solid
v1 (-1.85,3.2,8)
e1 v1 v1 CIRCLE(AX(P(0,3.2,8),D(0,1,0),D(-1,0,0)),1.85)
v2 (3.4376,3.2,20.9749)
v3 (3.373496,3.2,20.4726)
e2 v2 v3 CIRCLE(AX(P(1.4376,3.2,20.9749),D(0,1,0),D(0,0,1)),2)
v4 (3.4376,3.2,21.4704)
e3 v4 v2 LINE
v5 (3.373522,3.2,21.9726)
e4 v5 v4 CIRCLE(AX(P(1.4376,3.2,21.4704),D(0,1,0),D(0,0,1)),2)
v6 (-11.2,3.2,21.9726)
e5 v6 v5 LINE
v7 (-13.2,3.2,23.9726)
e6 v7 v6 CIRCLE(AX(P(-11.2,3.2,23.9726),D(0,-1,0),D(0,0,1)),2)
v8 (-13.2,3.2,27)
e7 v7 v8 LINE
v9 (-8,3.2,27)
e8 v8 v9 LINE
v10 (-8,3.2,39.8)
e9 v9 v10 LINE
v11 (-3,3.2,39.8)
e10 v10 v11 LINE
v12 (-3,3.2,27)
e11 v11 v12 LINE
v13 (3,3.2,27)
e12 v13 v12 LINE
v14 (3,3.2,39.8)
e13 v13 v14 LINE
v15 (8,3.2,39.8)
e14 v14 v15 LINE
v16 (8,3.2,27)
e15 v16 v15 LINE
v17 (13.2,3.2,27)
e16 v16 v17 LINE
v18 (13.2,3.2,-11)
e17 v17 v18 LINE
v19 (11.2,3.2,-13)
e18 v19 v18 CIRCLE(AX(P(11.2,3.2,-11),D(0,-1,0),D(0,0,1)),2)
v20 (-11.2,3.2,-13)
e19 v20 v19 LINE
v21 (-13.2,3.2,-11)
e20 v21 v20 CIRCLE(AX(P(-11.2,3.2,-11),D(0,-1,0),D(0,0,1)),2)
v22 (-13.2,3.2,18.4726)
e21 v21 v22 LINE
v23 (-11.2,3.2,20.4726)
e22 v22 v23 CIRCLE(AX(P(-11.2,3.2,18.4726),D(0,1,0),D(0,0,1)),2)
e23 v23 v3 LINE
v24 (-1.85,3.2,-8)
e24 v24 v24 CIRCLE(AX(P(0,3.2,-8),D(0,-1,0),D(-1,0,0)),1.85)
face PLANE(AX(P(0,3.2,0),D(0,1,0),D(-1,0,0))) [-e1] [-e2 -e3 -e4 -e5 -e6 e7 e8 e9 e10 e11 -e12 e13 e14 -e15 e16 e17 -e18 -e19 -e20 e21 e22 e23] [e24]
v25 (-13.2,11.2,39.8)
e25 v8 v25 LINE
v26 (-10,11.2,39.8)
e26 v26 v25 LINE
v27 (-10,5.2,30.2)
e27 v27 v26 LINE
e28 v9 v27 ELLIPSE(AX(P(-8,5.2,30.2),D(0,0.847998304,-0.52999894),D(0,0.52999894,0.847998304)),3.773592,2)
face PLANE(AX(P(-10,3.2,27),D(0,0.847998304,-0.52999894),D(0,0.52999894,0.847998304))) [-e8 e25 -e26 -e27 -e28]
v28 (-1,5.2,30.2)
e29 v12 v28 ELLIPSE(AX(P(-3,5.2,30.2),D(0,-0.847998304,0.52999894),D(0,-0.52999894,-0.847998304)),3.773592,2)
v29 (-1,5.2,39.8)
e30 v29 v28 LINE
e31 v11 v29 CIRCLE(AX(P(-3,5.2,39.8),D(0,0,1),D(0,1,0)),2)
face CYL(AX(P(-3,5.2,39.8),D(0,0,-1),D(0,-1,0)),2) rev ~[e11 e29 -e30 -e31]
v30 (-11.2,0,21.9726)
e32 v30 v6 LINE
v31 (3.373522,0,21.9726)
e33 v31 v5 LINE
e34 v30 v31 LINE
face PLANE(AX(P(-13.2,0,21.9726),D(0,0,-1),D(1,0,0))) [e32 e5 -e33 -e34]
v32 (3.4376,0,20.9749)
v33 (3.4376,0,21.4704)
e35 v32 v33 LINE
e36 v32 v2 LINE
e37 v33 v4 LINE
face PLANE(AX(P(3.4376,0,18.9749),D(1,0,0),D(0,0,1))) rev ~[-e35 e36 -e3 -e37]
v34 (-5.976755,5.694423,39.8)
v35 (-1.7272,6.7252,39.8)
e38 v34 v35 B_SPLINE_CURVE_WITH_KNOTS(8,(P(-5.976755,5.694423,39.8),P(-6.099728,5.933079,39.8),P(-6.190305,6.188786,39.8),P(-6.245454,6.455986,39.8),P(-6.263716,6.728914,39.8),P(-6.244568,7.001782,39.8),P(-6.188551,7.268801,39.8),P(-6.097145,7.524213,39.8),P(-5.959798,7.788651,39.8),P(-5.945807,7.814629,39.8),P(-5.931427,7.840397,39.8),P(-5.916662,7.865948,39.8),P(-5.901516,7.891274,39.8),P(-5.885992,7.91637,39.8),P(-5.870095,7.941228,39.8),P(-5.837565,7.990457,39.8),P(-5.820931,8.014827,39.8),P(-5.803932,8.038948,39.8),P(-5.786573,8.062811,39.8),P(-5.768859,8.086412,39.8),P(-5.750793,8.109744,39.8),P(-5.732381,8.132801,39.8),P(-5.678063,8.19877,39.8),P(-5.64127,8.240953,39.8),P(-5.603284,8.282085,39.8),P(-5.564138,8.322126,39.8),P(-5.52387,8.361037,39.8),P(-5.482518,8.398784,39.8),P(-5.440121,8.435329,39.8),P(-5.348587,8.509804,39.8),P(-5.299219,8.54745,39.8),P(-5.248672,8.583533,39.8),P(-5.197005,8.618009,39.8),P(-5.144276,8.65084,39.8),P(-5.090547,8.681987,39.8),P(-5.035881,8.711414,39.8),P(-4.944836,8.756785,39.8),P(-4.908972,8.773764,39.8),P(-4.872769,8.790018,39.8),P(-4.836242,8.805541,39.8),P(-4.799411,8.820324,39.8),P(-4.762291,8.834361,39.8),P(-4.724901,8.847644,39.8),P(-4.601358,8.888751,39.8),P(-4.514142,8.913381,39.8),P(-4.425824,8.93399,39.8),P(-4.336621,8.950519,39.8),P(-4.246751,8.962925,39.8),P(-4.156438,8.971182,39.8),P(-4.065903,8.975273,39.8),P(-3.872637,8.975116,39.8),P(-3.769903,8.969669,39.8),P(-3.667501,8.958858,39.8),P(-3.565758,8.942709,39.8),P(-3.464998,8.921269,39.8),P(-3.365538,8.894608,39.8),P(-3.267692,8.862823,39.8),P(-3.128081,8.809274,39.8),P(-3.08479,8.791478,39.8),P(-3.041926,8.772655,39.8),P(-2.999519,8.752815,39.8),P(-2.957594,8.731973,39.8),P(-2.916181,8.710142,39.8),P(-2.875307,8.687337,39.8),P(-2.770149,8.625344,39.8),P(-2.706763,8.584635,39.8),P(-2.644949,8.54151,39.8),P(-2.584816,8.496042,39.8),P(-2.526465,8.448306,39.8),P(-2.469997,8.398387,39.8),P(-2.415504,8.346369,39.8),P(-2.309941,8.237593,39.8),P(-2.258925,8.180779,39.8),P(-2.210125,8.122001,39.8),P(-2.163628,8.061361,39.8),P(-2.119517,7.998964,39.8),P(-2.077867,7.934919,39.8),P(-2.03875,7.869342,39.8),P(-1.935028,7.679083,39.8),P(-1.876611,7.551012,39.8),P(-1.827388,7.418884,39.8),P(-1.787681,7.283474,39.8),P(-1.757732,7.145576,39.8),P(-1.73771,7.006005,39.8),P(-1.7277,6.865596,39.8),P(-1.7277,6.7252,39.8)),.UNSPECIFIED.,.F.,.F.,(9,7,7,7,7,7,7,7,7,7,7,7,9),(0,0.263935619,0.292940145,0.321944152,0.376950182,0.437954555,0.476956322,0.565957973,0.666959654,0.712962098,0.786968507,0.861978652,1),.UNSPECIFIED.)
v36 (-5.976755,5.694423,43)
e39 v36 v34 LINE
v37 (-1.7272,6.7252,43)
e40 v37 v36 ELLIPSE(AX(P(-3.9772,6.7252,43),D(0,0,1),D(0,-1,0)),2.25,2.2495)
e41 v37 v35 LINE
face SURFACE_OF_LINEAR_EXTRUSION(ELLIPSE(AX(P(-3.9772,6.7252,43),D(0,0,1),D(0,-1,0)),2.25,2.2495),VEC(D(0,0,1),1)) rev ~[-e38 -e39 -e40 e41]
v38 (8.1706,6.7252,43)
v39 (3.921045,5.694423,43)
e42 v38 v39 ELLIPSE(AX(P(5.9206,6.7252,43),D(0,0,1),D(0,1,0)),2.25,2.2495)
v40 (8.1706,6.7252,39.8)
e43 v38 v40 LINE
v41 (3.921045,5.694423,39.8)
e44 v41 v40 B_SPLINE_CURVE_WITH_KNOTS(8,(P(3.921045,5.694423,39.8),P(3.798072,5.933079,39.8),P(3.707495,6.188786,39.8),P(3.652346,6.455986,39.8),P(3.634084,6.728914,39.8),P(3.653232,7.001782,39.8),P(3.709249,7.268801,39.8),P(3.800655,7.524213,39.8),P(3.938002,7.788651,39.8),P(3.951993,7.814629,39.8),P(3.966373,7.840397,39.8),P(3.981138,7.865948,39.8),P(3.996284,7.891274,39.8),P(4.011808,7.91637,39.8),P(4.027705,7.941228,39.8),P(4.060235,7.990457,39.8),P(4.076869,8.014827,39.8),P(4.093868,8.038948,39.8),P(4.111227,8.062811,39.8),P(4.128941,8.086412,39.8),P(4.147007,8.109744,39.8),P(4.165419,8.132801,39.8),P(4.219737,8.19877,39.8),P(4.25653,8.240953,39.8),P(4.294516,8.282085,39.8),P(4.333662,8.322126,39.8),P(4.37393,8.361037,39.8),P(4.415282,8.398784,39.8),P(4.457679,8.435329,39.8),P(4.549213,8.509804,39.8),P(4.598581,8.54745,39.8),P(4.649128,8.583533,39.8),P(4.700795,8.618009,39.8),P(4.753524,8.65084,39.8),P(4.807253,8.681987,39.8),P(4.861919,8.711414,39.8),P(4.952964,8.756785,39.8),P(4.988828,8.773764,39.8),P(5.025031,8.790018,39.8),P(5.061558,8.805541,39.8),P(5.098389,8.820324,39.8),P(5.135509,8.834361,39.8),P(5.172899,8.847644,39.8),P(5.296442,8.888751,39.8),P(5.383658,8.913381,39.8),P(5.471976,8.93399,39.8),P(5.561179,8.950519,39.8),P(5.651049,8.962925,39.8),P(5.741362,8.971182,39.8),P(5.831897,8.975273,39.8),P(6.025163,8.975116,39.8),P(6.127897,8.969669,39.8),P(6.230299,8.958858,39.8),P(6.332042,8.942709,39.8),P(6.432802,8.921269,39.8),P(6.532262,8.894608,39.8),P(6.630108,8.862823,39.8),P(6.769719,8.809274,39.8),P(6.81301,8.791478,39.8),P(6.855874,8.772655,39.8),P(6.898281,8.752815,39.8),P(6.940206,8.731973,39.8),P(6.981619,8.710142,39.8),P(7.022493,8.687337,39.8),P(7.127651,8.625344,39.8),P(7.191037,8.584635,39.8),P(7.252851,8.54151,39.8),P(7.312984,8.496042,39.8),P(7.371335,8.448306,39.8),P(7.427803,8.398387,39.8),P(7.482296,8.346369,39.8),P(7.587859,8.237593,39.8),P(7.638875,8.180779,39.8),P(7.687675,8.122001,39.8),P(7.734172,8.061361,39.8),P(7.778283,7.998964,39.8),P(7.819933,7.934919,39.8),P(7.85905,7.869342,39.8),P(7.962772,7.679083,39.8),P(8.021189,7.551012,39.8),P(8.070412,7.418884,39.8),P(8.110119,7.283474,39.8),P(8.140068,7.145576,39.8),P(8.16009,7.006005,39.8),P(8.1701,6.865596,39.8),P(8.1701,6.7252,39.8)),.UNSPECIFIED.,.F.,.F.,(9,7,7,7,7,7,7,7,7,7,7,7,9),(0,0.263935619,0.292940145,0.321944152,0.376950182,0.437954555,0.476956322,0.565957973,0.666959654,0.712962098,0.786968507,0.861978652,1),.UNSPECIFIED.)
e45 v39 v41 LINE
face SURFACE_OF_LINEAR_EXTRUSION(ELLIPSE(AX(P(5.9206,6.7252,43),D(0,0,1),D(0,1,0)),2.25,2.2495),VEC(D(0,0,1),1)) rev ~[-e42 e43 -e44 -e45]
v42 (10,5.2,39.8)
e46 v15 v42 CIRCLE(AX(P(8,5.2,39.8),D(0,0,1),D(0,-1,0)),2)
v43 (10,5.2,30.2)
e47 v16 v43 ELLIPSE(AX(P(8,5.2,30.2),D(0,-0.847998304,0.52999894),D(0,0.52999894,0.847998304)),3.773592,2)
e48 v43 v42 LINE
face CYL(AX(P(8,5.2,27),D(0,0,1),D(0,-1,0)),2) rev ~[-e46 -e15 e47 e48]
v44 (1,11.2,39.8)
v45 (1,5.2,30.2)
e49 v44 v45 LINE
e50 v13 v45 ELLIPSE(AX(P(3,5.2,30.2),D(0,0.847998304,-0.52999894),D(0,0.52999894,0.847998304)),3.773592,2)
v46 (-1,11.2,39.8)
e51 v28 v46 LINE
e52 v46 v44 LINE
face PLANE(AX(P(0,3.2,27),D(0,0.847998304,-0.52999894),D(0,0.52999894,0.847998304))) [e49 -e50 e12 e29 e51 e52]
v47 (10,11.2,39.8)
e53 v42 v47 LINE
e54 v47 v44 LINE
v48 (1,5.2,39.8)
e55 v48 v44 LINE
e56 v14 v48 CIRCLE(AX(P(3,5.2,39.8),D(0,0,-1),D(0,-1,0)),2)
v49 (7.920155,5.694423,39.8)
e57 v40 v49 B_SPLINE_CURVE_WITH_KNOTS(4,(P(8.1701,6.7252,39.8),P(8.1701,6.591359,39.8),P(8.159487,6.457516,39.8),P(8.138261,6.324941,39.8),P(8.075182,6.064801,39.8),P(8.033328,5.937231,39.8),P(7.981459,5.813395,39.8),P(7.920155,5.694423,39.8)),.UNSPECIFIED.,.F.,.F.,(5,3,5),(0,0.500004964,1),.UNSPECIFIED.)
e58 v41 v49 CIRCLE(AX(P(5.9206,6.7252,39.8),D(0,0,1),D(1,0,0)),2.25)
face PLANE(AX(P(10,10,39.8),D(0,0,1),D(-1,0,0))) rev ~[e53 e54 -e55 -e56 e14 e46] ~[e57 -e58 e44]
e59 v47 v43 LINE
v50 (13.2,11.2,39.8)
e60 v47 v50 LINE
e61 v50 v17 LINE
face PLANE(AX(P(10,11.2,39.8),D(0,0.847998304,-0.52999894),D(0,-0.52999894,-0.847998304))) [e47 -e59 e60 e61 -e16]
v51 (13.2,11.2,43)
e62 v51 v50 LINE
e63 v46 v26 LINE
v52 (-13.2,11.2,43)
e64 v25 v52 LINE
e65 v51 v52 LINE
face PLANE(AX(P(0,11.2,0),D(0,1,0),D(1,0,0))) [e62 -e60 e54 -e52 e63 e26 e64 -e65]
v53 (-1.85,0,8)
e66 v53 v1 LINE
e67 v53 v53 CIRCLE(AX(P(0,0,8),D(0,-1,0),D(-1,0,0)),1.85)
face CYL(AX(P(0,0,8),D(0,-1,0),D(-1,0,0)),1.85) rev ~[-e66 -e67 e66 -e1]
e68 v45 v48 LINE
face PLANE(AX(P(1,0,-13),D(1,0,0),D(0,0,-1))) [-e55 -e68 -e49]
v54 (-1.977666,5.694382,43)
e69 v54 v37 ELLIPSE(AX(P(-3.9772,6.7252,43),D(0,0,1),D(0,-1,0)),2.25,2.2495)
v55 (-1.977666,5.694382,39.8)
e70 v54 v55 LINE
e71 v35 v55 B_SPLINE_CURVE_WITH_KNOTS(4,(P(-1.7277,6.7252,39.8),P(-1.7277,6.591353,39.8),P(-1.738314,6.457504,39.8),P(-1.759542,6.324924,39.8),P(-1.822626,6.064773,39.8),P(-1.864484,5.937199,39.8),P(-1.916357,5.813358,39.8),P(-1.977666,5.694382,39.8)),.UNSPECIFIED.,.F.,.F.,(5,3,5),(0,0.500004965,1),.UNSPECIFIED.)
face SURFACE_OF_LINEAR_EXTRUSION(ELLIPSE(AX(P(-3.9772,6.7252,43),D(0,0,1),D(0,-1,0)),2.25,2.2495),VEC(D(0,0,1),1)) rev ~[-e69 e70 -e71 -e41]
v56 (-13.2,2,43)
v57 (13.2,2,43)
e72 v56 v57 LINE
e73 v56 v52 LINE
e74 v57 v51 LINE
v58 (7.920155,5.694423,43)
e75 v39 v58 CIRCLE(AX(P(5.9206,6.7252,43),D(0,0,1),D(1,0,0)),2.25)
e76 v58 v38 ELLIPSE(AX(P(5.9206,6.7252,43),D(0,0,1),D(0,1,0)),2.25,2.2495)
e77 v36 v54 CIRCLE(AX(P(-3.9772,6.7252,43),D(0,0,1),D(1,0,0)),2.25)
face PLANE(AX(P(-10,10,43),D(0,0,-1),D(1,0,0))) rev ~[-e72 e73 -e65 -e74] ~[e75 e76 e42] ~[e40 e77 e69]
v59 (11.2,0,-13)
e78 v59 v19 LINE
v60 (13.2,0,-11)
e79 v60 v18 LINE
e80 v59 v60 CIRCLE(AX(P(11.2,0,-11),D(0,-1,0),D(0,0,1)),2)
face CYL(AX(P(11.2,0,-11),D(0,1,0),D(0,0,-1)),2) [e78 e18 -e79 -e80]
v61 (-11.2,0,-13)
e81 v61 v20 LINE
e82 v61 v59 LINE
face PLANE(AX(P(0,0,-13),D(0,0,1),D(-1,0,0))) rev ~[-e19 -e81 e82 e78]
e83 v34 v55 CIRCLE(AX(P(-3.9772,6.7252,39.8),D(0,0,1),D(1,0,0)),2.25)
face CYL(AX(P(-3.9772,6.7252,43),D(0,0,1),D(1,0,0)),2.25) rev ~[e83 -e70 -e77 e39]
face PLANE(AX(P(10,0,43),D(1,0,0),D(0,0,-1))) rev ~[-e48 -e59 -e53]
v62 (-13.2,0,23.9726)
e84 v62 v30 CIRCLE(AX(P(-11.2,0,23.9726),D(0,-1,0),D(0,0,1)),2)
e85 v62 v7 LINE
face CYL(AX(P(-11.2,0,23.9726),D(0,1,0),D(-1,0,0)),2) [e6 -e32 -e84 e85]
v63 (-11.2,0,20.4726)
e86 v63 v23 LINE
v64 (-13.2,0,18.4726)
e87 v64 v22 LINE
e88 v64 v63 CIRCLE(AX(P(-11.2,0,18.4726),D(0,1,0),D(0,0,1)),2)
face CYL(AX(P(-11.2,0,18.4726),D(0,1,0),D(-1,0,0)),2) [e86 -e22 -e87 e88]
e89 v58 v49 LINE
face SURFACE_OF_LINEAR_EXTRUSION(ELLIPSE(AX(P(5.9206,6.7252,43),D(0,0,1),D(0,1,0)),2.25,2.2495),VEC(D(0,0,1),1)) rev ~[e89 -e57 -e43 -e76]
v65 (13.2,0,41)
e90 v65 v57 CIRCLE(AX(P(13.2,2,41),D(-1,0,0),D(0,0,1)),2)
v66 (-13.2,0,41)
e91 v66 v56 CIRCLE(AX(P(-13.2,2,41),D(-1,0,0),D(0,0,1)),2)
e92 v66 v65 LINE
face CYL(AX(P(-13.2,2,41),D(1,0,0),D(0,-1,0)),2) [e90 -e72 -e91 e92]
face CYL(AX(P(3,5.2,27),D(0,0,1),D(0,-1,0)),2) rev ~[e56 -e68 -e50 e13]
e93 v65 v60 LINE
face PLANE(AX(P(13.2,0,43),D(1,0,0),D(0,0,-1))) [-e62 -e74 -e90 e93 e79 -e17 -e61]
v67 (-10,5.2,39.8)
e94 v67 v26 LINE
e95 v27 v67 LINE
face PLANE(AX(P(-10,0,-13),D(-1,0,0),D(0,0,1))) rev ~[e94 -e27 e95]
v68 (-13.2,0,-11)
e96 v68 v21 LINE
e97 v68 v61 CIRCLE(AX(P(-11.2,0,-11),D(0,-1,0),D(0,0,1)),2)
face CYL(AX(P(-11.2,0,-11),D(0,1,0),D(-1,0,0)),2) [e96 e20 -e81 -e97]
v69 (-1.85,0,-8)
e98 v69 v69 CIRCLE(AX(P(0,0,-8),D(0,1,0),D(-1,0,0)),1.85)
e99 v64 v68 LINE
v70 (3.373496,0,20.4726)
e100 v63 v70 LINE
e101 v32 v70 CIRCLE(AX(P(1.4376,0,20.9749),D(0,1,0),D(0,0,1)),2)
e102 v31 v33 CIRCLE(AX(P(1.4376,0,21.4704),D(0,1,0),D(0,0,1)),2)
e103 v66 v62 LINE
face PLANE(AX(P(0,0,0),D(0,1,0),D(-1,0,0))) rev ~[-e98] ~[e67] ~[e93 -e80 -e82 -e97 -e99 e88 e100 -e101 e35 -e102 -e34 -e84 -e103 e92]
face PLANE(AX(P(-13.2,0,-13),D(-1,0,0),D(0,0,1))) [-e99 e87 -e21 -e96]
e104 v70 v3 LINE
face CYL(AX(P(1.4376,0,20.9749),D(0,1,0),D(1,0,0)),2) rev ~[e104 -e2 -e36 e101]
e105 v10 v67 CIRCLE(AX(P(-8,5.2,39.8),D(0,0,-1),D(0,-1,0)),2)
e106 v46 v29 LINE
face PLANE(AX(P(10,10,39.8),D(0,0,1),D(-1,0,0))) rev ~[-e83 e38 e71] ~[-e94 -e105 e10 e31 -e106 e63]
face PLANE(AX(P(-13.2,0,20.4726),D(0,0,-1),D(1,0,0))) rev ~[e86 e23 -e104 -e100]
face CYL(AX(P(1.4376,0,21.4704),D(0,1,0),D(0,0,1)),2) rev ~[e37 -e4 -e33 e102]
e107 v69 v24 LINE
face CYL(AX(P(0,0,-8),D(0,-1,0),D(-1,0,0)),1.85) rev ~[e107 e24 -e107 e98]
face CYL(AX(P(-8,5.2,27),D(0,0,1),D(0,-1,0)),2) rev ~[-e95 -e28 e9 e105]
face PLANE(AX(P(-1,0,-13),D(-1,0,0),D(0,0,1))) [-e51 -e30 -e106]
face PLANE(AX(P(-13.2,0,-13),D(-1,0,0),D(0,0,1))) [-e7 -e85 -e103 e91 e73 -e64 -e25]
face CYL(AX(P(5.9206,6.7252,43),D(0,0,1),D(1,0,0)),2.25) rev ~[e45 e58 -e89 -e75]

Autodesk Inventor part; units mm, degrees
ref_plane "YZ Plane" through (0, 0, 0) normal (1, 0, 0) x (0, 1, 0)
ref_plane "XZ Plane" through (0, 0, 0) normal (0, 1, 0) x (-1, 0, 0)
ref_plane "XY Plane" through (0, 0, 0) normal (0, 0, 1) x (1, 0, 0)
sketch "Эскиз1" plane through (0, 0, 0) normal (0, 1, 0) x (-1, 0, 0)
  circle A0 centre (0, 8) radius 1.85
  circle A1 centre (0, -8) radius 1.85
  line L0 (0, -8) -> (0, -13)
  line L1 (0, -13) -> (5, -13)
  line L2 (5, -13) -> (5, 43)
  line L3 (5, 43) -> (0, 43)
  line L4 (0, 43) -> (0, -13)
  line L5 (0, -13) -> (-5, -13)
  line L6 (-5, -13) -> (-5, 43)
  line L7 (-5, 43) -> (0, 43)
  line L8 (5, -13) -> (10, -13)
  line L9 (10, -13) -> (10, 43)
  line L10 (10, 43) -> (5, 43)
  line L11 (5, 43) -> (5, -13)
  line L12 (-5, -13) -> (-10, -13)
  line L13 (-10, -13) -> (-10, 43)
  line L14 (-10, 43) -> (-5, 43)
  line L15 (-5, 43) -> (-5, -13)
  point P0 (0, 0)
  dimension "d0" = 5
  dimension "d2" = 56
extrude "Выдавливание1" add sketch "Эскиз1" along normal blind 3.2 contours A0 L4 L3 L2 L1 L0 A1 | A0 L4 A1 L0 L5 L6 L7 | L10 L9 L8 L2 | L6 L12 L13 L14
sketch "Эскиз2" plane through (0, 0, 0) normal (0, -1, 0) x (1, 0, 0)
  line L0 (-10, 43) -> (10, 43) projected
  line L1 (-10, 43) -> (10, 43)
  line L2 (10, 43) -> (10, 39.8)
  line L3 (10, 39.8) -> (-10, 39.8)
  line L4 (-10, 39.8) -> (-10, 43)
  point P0 (0, 0)
  dimension "d9" = 20
  dimension "d10" = 3.2
extrude "Выдавливание2" add sketch "Эскиз2" against normal blind 10
sketch "Эскиз3" plane through (0, 10, 0) normal (0, 1, 0) x (1, 0, 0)
  line L0 (10, -39.8) -> (-10, -39.8) projected
  line L1 (-10, -39.8) -> (-10, -43) projected
  line L2 (-10, -43) -> (10, -43) projected
  line L3 (10, -43) -> (10, -39.8) projected
  point P0 (0, 0)
extrude "Выдавливание3" add sketch "Эскиз3" along normal blind 1.2
sketch "Эскиз4" plane through (-10, 0, 43) normal (0, 0, 1) x (1, 0, 0)
  point P0 (10, 0)
sketch "Эскиз5" plane through (-10, 0, 43) normal (0, 0, 1) x (1, 0, 0)
  ellipse E0 centre (6.0228, 6.7252) end of major axis (6.0228, 4.4752) minor radius 2.2495 (8.0223, 5.6944) -> (4.0232, 5.6944) ccw projected
  ellipse E1 centre (15.9206, 6.7252) end of major axis (15.9206, 8.9752) minor radius 2.2495 (17.9202, 5.6944) -> (13.921, 5.6944) ccw projected
  circle A0 centre (6.0228, 6.7252) radius 2.25
  circle A1 centre (15.9206, 6.7252) radius 2.25
  point P0 (10, 0)
  point P1 (15.9206, 8.9752)
  point P2 (15.9696, 8.975)
  point P3 (6.0719, 8.975)
  point P4 (6.0228, 8.9752)
extrude "Выдавливание4" cut sketch "Эскиз5" against normal through all
sketch "Эскиз6" plane through (10, 0, 43) normal (1, 0, 0) x (0, 0, -1)
  line L0 (0, 0) -> (56, 0) projected
  line L1 (56, 0) -> (56, 3.2) projected
  line L2 (3.2, 3.2) -> (56, 3.2) projected
  line L3 (3.2, 3.2) -> (3.2, 11.2) projected
  line L4 (0, 11.2) -> (3.2, 11.2) projected
  line L5 (0, 0) -> (0, 11.2) projected
  line L6 (3.2, 11.2) -> (16, 3.2)
  point P0 (43, 0)
extrude "Выдавливание5" add sketch "Эскиз6" along normal blind 3.2
sketch "Эскиз7" plane through (-10, 0, -13) normal (-1, 0, 0) x (0, 0, 1)
  line L0 (52.8, 3.2) -> (52.8, 11.2) projected
  line L1 (40, 3.2) -> (52.8, 11.2) projected
  line L2 (52.8, 3.2) -> (40, 3.2) projected
  line L3 (0, 3.2) -> (52.8, 3.2) projected
  line L4 (0, 0) -> (0, 3.2) projected
  line L5 (0, 0) -> (56, 0) projected
  line L6 (56, 0) -> (56, 11.2) projected
  line L7 (52.8, 11.2) -> (56, 11.2) projected
  line L8 (52.8, 3.2) -> (52.8, 11.2) projected
  point P0 (13, 0)
extrude "Выдавливание6" add sketch "Эскиз7" along normal blind 3.2
ref_plane "РабПлоскость1" through (0, 0, -13) normal (1, 0, 0) x (0, 0, -1)
sketch "Эскиз8" plane through (0, 0, -13) normal (1, 0, 0) x (0, 0, -1)
  line L0 (-40, 3.2) -> (-52.8, 3.2) projected
  line L1 (-52.8, 11.2) -> (-40, 3.2) projected
  line L2 (-52.8, 3.2) -> (-52.8, 11.2) projected
  point P0 (-13, 0)
extrude "Выдавливание7" add sketch "Эскиз8" along normal blind 1
sketch "Эскиз9" plane through (0, 0, -13) normal (-1, 0, 0) x (0, 0, 1)
  line L0 (52.8, 11.2) -> (52.8, 3.2) projected
  line L1 (40, 3.2) -> (52.8, 11.2) projected
  line L2 (52.8, 3.2) -> (40, 3.2) projected
  point P0 (13, 0)
extrude "Выдавливание8" add sketch "Эскиз9" along normal blind 1
fillet "Сопряжение1" radius 2 4 edges at (10, 3.2, 33.4) (-10, 3.2, 33.4) (1, 3.2, 33.4) (-1, 3.2, 33.4)
sketch "Эскиз10" plane through (0, 0, 0) normal (0, -1, 0) x (1, 0, 0)
  line L0 (-3.0752, 19.5502) -> (-3.0021, 23.0495) projected
  arc A0 (3.9956, 22.9433) -> (3.5069, 23.4136) centre (3.4965, 22.9137) ccw projected
  line L1 (9.496, 22.8284) -> (3.9956, 22.9433) projected
  line L2 (9.9129, 42.784) -> (9.496, 22.8284) projected
  line L3 (-8.0832, 43.16) -> (9.9129, 42.784) projected
  line L4 (-8.0832, 43.16) -> (-8.5001, 23.2044) projected
  line L5 (-2.9997, 23.0894) -> (-8.5001, 23.2044) projected
  arc A1 (-2.4918, 23.5389) -> (-2.9997, 23.0894) centre (-2.5022, 23.039) ccw projected
  line L6 (-2.4918, 23.5389) -> (3.5069, 23.4136) projected
  line L7 (-3.0752, 19.5502) -> (-3.0021, 23.0495) projected
  line L8 (-8.5009, 23.1644) -> (-3.0021, 23.0495) projected
  line L9 (-8.584, 19.1852) -> (-8.5009, 23.1644) projected
  line L10 (-2.7253, 19.0628) -> (-8.584, 19.1852) projected
  arc A2 (-3.0752, 19.5502) -> (-2.7253, 19.0628) centre (-2.5753, 19.5398) ccw projected
  arc A3 (3.5533, 18.9317) -> (3.9233, 19.404) centre (3.4234, 19.4145) ccw projected
  line L11 (9.412, 18.8093) -> (3.5533, 18.9317) projected
  line L12 (9.412, 18.8093) -> (9.4952, 22.7884) projected
  line L13 (3.9964, 22.9033) -> (9.4952, 22.7884) projected
  line L14 (3.9964, 22.9033) -> (3.9233, 19.404) projected
  line L15 (-8.0067, 17.5728) -> (-4.9183, 17.5083) projected
  line L16 (-4.9183, 17.5083) -> (-4.9475, 16.1086) projected
  line L17 (-4.9475, 16.1086) -> (5.6502, 15.8872) projected
  line L18 (5.6502, 15.8872) -> (5.6794, 17.2869) projected
  line L19 (5.6794, 17.2869) -> (8.7679, 17.2224) projected
  line L20 (9.4912, 18.8003) -> (8.7679, 17.2224) projected
  ellipse E0 centre (9.3638, 16.5021) end of major axis (9.412, 18.8093) minor radius 1 (9.4912, 18.8003) -> (9.412, 18.8093) ccw projected
  line L21 (9.412, 18.8093) -> (3.5533, 18.9317) projected
  line L22 (3.5533, 18.9317) -> (-2.7253, 19.0628) projected
  line L23 (-2.7253, 19.0628) -> (-8.584, 19.1852) projected
  ellipse E1 centre (-8.6322, 16.878) end of major axis (-8.584, 19.1852) minor radius 1 (-8.584, 19.1852) -> (-8.6635, 19.1796) ccw projected
  line L24 (-8.0067, 17.5728) -> (-8.6635, 19.1796) projected
  line L25 (3.4376, 23.4704) -> (-15, 23.4704)
  line L26 (-15, 23.4704) -> (-15, 18.9749)
  line L27 (-15, 18.9749) -> (3.4376, 18.9749)
  line L28 (3.4376, 18.9749) -> (3.4376, 23.4704)
  point P0 (0, 0)
extrude "Выдавливание9" cut sketch "Эскиз10" against normal through all contours A2 L10 L9 L8 L0 | L0 L8 L9 E1 L24 L27 L26 L25 L4 L5 A1 L6 L28 L22 A2 | L22 L27 L24 E1 L10 | L6 L25 L28 | L25 A1 L5 L4
fillet "Сопряжение2" radius 2 2 edges at (3.4376, 1.6, 23.4704) (3.4376, 1.6, 18.9749)
fillet "Сопряжение3" radius 2 4 edges at (13.2, 1.6, -13) (-13.2, 1.6, -13) (-13.2, 1.6, 23.4704) (-13.2, 1.6, 18.9749)
fillet "Сопряжение4" radius 2 1 edges at (0, 0, 43)
sketch "Эскиз11" plane through (0, 0, 0) normal (0, -1, 0) x (1, 0, 0)
  line L0 (3.4376, 21.4704) -> (3.4376, 20.9749) projected
  line L1 (3.4376, 21.2226) -> (-14.4424, 21.2226)
  line L2 (3.4376, 21.2226) -> (-13.5624, 21.2226)
  line L3 (-13.5624, 21.2226) -> (-13.5624, 21.9726)
  line L4 (-13.5624, 21.9726) -> (3.4376, 21.9726)
  line L5 (3.4376, 21.9726) -> (3.4376, 21.2226)
  line L6 (-13.5624, 21.2226) -> (-13.5624, 20.4726)
  line L7 (-13.5624, 20.4726) -> (3.4376, 20.4726)
  line L8 (3.4376, 20.4726) -> (3.4376, 21.2226)
  circle A0 centre (0, -8) radius 1.85 projected
  circle A1 centre (0, 8) radius 1.85 projected
  line L9 (-13.2, 41) -> (13.2, 41) projected
  line L10 (-13.2, 25.4704) -> (-13.2, 41) projected
  arc A2 (-13.2, 25.4704) -> (-11.2, 23.4704) centre (-11.2, 25.4704) ccw projected
  line L11 (-11.2, 23.4704) -> (1.4376, 23.4704) projected
  arc A3 (3.4376, 21.4704) -> (1.4376, 23.4704) centre (1.4376, 21.4704) ccw projected
  line L12 (3.4376, 21.4704) -> (3.4376, 20.9749) projected
  arc A4 (1.4376, 18.9749) -> (3.4376, 20.9749) centre (1.4376, 20.9749) ccw projected
  line L13 (1.4376, 18.9749) -> (-11.2, 18.9749) projected
  arc A5 (-11.2, 18.9749) -> (-13.2, 16.9749) centre (-11.2, 16.9749) ccw projected
  line L14 (-13.2, -11) -> (-13.2, 16.9749) projected
  arc A6 (-13.2, -11) -> (-11.2, -13) centre (-11.2, -11) ccw projected
  line L15 (-11.2, -13) -> (11.2, -13) projected
  arc A7 (11.2, -13) -> (13.2, -11) centre (11.2, -11) ccw projected
  line L16 (13.2, 41) -> (13.2, -11) projected
  line L17 (-13.2, 16.9749) -> (-13.2, -11) projected
  line L18 (-13.2, 25.4704) -> (-13.2, 16.9749)
  point P0 (0, 0)
  point P1 (-13.2, 21.9726)
  point P2 (3.3735, 21.9726)
  point P3 (3.3735, 20.4726)
  point P4 (-13.2, 20.4726)
  dimension "d30" = 17
  dimension "d31" = 0.75
extrude "Выдавливание10" add sketch "Эскиз11" against normal up to surface (3.2 mm away) contours L4 L18 A2 L11 A3 | A4 L13 A5 L18 L7
fillet "Сопряжение5" radius 2 2 edges at (-13.2, 1.6, 20.4726) (-13.2, 1.6, 21.9726)
properties part number "для захвата"
